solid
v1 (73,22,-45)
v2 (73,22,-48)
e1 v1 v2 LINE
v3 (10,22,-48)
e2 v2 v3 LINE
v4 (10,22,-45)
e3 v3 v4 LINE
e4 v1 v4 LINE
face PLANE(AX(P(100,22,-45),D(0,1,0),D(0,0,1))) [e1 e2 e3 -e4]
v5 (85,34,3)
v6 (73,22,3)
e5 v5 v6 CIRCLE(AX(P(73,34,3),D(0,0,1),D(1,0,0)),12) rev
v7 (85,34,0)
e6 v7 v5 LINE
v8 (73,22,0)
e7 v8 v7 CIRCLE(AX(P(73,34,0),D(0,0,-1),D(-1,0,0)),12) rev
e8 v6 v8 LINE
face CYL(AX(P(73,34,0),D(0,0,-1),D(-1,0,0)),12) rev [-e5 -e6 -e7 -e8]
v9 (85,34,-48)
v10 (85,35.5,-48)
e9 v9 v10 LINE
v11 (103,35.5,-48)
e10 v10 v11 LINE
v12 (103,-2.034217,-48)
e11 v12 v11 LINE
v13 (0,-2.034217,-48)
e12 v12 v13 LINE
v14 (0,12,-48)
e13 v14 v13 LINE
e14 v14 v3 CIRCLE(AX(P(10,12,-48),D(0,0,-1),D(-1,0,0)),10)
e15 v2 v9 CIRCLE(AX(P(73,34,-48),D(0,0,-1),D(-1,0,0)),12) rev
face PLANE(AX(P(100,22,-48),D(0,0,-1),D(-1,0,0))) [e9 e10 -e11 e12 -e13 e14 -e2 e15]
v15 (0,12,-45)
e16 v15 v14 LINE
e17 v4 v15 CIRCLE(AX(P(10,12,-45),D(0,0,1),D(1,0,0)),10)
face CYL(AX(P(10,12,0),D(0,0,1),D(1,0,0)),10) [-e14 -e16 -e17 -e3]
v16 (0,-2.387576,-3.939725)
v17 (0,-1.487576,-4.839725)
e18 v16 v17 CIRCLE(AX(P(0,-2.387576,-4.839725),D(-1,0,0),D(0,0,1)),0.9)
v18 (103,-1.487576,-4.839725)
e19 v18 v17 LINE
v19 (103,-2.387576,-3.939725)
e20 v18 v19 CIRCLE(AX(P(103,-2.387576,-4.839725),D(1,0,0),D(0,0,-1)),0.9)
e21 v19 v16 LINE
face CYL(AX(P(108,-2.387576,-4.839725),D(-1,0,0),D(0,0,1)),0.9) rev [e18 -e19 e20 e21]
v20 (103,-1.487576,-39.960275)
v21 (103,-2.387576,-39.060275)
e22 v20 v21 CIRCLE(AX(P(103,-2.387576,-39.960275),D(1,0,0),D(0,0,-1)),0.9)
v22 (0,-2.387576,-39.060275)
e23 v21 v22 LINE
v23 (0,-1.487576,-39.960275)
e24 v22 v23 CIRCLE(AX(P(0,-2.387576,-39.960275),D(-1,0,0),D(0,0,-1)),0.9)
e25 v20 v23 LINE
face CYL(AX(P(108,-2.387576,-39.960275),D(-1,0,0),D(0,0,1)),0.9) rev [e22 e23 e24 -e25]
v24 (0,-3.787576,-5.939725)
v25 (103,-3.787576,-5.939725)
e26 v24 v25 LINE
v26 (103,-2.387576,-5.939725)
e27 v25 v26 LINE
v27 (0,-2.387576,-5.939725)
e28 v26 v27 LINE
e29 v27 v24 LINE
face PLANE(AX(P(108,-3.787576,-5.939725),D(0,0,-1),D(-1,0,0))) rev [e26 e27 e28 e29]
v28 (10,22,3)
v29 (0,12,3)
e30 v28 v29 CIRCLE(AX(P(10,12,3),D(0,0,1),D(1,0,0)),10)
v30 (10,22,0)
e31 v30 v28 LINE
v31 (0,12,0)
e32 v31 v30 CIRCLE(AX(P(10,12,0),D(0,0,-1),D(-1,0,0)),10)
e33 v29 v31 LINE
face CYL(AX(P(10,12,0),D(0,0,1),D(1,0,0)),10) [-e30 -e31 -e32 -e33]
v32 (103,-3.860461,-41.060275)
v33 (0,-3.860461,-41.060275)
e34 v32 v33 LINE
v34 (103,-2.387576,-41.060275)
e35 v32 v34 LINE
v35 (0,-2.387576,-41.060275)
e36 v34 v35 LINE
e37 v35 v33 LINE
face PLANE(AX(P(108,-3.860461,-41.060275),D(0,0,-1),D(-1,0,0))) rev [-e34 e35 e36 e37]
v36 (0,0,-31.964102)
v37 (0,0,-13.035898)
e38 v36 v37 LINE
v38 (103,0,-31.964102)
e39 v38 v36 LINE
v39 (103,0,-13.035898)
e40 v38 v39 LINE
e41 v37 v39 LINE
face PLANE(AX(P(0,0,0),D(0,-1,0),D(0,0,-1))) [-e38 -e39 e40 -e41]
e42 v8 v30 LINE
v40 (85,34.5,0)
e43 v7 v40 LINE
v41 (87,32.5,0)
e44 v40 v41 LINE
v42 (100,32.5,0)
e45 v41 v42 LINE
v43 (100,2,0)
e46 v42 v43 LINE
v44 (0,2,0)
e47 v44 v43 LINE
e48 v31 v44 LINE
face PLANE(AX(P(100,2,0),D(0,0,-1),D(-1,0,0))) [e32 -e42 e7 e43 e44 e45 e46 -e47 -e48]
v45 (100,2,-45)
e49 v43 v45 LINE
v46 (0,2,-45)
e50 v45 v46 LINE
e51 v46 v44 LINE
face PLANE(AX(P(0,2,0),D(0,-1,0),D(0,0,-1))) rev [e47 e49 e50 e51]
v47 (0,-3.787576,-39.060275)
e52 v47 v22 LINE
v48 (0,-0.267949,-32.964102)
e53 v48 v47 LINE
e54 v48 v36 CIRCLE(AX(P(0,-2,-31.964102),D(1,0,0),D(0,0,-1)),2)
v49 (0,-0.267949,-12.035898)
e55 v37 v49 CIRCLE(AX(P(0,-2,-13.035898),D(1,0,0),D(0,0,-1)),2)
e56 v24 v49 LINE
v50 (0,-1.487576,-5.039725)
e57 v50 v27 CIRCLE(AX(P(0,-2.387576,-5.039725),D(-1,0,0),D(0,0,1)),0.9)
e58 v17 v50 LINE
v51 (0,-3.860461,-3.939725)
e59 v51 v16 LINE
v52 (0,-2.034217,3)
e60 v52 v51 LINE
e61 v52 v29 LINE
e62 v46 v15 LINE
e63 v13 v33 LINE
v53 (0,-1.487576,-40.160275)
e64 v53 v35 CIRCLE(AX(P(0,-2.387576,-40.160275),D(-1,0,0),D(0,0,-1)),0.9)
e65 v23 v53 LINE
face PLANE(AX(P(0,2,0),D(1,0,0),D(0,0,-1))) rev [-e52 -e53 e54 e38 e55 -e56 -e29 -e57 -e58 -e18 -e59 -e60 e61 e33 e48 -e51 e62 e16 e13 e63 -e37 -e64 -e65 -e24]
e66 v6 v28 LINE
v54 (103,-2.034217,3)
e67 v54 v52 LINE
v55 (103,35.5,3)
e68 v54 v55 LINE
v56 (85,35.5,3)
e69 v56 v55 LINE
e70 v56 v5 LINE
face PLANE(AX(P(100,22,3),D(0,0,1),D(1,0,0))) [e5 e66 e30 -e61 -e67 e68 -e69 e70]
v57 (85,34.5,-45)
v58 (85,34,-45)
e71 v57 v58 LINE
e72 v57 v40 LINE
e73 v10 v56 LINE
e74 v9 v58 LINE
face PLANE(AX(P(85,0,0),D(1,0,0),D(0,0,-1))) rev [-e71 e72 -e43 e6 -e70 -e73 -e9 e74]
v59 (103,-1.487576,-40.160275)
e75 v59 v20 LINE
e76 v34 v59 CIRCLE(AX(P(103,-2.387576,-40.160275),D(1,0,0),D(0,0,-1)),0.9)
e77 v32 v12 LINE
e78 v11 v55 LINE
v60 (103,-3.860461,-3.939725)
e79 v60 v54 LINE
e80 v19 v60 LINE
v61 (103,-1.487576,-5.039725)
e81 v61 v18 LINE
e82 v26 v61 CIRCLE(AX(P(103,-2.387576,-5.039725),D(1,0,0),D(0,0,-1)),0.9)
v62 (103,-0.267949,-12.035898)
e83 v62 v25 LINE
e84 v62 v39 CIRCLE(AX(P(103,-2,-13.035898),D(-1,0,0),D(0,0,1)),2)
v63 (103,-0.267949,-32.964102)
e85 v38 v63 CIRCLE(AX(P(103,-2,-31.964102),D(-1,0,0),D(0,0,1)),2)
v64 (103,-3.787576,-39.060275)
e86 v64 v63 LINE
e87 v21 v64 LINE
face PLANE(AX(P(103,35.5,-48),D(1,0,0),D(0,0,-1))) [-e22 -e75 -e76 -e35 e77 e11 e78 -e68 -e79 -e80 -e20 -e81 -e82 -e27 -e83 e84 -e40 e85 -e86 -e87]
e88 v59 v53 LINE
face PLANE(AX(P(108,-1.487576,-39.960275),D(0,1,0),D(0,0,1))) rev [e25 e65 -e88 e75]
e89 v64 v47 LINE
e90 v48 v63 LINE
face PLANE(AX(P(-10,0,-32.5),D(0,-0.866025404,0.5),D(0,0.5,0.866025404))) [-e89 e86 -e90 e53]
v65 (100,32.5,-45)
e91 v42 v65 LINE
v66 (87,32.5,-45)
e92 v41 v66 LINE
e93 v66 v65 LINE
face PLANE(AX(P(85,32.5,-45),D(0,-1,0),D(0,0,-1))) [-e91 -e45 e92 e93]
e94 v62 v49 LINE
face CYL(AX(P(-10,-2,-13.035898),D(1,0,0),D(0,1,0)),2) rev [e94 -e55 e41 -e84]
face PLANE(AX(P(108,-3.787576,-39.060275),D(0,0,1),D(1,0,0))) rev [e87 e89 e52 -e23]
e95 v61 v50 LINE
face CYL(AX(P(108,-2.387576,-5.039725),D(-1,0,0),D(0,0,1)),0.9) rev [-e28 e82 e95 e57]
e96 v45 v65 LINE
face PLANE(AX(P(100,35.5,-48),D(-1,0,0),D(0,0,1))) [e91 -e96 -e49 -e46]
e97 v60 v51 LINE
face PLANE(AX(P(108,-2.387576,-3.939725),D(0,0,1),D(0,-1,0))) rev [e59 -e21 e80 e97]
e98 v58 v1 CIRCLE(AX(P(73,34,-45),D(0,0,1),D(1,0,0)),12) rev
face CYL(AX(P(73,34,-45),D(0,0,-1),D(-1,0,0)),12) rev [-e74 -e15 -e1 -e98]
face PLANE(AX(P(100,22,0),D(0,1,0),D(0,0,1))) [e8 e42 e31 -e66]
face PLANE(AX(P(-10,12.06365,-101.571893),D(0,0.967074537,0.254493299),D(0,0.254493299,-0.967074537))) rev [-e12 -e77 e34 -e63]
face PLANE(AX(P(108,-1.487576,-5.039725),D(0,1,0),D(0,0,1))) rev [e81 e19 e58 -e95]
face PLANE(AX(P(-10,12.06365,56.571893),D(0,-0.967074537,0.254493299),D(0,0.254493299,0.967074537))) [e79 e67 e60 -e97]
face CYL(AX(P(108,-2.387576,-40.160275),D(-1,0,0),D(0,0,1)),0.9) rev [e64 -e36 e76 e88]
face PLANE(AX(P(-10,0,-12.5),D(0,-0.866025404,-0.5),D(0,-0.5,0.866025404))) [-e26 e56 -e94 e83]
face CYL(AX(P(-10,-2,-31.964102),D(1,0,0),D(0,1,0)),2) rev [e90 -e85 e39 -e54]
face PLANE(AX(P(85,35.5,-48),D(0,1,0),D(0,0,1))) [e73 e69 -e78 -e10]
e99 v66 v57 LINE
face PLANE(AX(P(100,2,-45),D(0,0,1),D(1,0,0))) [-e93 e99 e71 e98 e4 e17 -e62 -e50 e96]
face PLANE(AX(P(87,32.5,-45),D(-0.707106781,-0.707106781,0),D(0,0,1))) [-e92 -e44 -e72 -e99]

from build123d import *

# Parameters (mm, degrees)
SKETCH1_W                = 100
SKETCH1_H                = 45
BOSS_EXTRUDE1_DEPTH      = 2
BOSS_EXTRUDE2_DEPTH      = 100
BOSS_EXTRUDE3_DEPTH      = 15
CHAMFER2_SIZE            = 2
BOSS_EXTRUDE4_DEPTH      = 3
BOSS_EXTRUDE4_DEPTH_BACK = 48
SKETCH4_W                = 3
SKETCH4_H                = 35.5
BOSS_EXTRUDE6_DEPTH      = 103
CUT_EXTRUDE1_DEPTH       = 108
FILLET1_R                = 12
FILLET2_R                = 10


# Read off the part's stored shape, not the designer's step: Boss-Extrude6
with BuildPart() as part:
    # Sketch1 → Boss-Extrude1 (new body)
    with BuildSketch(Plane(origin=(0, 0, 0), x_dir=(1, 0, 0), z_dir=(0, 1, 0))):
        with Locations((50, 22.5)):
            Rectangle(SKETCH1_W, SKETCH1_H)
    extrude(amount=BOSS_EXTRUDE1_DEPTH)

    # Sketch2 → Boss-Extrude2 (add)
    with BuildSketch(Plane.ZY):
        Polygon((0, 2), (0, 22), (3, 22), (3, 0), (0, 0), align=None)
        Polygon((-45, 2), (-45, 22), (-48, 22), (-48, 0), (-45, 0), align=None)
    extrude(amount=-BOSS_EXTRUDE2_DEPTH)

    # Sketch3 → Boss-Extrude3 (add)
    with BuildSketch(Plane(origin=(100, 0, 0), x_dir=(0, 0, -1), z_dir=(1, 0, 0))):
        Polygon((0, 22), (0, 32.5), (45, 32.5), (45, 22), (48, 22), (48, 35.5), (-3, 35.5), (-3, 22), align=None)
    extrude(amount=-BOSS_EXTRUDE3_DEPTH)

    # Chamfer2
    chamfer2_edges = [part.edges().sort_by_distance(p)[0] for p in [
        (85, 32.5, -22.5),
    ]]
    chamfer(chamfer2_edges, length=CHAMFER2_SIZE)

    # Sketch4 → Boss-Extrude4 (add, two sides: drawn at the far end of the back side and taken through both)
    with BuildSketch(Plane.XY.offset(-BOSS_EXTRUDE4_DEPTH_BACK)):
        with Locations((101.5, 17.75)):
            Rectangle(SKETCH4_W, SKETCH4_H)
    extrude(amount=BOSS_EXTRUDE4_DEPTH + BOSS_EXTRUDE4_DEPTH_BACK)

    # Boss-Extrude6 outline → Boss-Extrude6 (add)
    with BuildSketch(Plane.YZ):
        with BuildLine():
            Line((0, -48), (0, -31.964101615))
            ThreePointArc((0, -31.964101615), (-0.068148347, -32.481739705), (-0.267949192, -32.964101615))
            Line((-0.267949192, -32.964101615), (-3.78757632, -39.060274624))
            ThreePointArc((-3.78757632, -39.060274624), (-4.037826078, -39.794785514), (-3.989674587, -40.569261223))
            Line((-3.989674587, -40.569261223), (-2.034217014, -48))
            Line((-2.034217014, -48), (0, -48))
        make_face()
        with BuildLine():
            ThreePointArc((-3.989674587, -4.430738777), (-4.037826078, -5.205214486), (-3.78757632, -5.939725376))
            Line((-3.78757632, -5.939725376), (-0.267949192, -12.035898385))
            ThreePointArc((-0.267949192, -12.035898385), (-0.068148347, -12.518260295), (0, -13.035898385))
            Line((0, -13.035898385), (0, 3))
            Line((0, 3), (-2.034217014, 3))
            Line((-2.034217014, 3), (-3.989674587, -4.430738777))
        make_face()
    extrude(amount=BOSS_EXTRUDE6_DEPTH)

    # Sketch6 → Cut-Extrude1 (cut)
    with BuildSketch(Plane.ZY):
        with BuildLine():
            Line((-39.060274624, -3.78757632), (-39.060274624, -2.38757632))
            ThreePointArc((-39.060274624, -2.38757632), (-39.323878521, -1.751180217), (-39.960274624, -1.48757632))
            Line((-39.960274624, -1.48757632), (-40.160274624, -1.48757632))
            ThreePointArc((-40.160274624, -1.48757632), (-40.796670727, -1.751180217), (-41.060274624, -2.38757632))
            Line((-41.060274624, -2.38757632), (-41.060274624, -3.860460534))
            Line((-41.060274624, -3.860460534), (-41.060274624, -4.910280297))
            Line((-41.060274624, -4.910280297), (-39.060274624, -4.910280297))
            Line((-39.060274624, -4.910280297), (-39.060274624, -3.78757632))
        make_face()
        with BuildLine():
            Line((-5.939725376, -3.78757632), (-5.939725376, -2.38757632))
            ThreePointArc((-5.939725376, -2.38757632), (-5.676121479, -1.751180217), (-5.039725376, -1.48757632))
            Line((-5.039725376, -1.48757632), (-4.839725376, -1.48757632))
            ThreePointArc((-4.839725376, -1.48757632), (-4.203329273, -1.751180217), (-3.939725376, -2.38757632))
            Line((-3.939725376, -2.38757632), (-3.939725376, -3.860460534))
            Line((-3.939725376, -3.860460534), (-3.939725376, -5.247114717))
            Line((-3.939725376, -5.247114717), (-5.939725376, -5.247114717))
            Line((-5.939725376, -5.247114717), (-5.939725376, -3.78757632))
        make_face()
    extrude(amount=-CUT_EXTRUDE1_DEPTH, mode=Mode.SUBTRACT)

    # Fillet1
    fillet1_edges = [part.edges().sort_by_distance(p)[0] for p in [
        (85, 22, 1.5),
        (85, 22, -46.5),
    ]]
    fillet(fillet1_edges, radius=FILLET1_R)

    # Fillet2
    fillet2_edges = [part.edges().sort_by_distance(p)[0] for p in [
        (0, 22, 1.5),
        (0, 22, -46.5),
    ]]
    fillet(fillet2_edges, radius=FILLET2_R)


solid = part.part
